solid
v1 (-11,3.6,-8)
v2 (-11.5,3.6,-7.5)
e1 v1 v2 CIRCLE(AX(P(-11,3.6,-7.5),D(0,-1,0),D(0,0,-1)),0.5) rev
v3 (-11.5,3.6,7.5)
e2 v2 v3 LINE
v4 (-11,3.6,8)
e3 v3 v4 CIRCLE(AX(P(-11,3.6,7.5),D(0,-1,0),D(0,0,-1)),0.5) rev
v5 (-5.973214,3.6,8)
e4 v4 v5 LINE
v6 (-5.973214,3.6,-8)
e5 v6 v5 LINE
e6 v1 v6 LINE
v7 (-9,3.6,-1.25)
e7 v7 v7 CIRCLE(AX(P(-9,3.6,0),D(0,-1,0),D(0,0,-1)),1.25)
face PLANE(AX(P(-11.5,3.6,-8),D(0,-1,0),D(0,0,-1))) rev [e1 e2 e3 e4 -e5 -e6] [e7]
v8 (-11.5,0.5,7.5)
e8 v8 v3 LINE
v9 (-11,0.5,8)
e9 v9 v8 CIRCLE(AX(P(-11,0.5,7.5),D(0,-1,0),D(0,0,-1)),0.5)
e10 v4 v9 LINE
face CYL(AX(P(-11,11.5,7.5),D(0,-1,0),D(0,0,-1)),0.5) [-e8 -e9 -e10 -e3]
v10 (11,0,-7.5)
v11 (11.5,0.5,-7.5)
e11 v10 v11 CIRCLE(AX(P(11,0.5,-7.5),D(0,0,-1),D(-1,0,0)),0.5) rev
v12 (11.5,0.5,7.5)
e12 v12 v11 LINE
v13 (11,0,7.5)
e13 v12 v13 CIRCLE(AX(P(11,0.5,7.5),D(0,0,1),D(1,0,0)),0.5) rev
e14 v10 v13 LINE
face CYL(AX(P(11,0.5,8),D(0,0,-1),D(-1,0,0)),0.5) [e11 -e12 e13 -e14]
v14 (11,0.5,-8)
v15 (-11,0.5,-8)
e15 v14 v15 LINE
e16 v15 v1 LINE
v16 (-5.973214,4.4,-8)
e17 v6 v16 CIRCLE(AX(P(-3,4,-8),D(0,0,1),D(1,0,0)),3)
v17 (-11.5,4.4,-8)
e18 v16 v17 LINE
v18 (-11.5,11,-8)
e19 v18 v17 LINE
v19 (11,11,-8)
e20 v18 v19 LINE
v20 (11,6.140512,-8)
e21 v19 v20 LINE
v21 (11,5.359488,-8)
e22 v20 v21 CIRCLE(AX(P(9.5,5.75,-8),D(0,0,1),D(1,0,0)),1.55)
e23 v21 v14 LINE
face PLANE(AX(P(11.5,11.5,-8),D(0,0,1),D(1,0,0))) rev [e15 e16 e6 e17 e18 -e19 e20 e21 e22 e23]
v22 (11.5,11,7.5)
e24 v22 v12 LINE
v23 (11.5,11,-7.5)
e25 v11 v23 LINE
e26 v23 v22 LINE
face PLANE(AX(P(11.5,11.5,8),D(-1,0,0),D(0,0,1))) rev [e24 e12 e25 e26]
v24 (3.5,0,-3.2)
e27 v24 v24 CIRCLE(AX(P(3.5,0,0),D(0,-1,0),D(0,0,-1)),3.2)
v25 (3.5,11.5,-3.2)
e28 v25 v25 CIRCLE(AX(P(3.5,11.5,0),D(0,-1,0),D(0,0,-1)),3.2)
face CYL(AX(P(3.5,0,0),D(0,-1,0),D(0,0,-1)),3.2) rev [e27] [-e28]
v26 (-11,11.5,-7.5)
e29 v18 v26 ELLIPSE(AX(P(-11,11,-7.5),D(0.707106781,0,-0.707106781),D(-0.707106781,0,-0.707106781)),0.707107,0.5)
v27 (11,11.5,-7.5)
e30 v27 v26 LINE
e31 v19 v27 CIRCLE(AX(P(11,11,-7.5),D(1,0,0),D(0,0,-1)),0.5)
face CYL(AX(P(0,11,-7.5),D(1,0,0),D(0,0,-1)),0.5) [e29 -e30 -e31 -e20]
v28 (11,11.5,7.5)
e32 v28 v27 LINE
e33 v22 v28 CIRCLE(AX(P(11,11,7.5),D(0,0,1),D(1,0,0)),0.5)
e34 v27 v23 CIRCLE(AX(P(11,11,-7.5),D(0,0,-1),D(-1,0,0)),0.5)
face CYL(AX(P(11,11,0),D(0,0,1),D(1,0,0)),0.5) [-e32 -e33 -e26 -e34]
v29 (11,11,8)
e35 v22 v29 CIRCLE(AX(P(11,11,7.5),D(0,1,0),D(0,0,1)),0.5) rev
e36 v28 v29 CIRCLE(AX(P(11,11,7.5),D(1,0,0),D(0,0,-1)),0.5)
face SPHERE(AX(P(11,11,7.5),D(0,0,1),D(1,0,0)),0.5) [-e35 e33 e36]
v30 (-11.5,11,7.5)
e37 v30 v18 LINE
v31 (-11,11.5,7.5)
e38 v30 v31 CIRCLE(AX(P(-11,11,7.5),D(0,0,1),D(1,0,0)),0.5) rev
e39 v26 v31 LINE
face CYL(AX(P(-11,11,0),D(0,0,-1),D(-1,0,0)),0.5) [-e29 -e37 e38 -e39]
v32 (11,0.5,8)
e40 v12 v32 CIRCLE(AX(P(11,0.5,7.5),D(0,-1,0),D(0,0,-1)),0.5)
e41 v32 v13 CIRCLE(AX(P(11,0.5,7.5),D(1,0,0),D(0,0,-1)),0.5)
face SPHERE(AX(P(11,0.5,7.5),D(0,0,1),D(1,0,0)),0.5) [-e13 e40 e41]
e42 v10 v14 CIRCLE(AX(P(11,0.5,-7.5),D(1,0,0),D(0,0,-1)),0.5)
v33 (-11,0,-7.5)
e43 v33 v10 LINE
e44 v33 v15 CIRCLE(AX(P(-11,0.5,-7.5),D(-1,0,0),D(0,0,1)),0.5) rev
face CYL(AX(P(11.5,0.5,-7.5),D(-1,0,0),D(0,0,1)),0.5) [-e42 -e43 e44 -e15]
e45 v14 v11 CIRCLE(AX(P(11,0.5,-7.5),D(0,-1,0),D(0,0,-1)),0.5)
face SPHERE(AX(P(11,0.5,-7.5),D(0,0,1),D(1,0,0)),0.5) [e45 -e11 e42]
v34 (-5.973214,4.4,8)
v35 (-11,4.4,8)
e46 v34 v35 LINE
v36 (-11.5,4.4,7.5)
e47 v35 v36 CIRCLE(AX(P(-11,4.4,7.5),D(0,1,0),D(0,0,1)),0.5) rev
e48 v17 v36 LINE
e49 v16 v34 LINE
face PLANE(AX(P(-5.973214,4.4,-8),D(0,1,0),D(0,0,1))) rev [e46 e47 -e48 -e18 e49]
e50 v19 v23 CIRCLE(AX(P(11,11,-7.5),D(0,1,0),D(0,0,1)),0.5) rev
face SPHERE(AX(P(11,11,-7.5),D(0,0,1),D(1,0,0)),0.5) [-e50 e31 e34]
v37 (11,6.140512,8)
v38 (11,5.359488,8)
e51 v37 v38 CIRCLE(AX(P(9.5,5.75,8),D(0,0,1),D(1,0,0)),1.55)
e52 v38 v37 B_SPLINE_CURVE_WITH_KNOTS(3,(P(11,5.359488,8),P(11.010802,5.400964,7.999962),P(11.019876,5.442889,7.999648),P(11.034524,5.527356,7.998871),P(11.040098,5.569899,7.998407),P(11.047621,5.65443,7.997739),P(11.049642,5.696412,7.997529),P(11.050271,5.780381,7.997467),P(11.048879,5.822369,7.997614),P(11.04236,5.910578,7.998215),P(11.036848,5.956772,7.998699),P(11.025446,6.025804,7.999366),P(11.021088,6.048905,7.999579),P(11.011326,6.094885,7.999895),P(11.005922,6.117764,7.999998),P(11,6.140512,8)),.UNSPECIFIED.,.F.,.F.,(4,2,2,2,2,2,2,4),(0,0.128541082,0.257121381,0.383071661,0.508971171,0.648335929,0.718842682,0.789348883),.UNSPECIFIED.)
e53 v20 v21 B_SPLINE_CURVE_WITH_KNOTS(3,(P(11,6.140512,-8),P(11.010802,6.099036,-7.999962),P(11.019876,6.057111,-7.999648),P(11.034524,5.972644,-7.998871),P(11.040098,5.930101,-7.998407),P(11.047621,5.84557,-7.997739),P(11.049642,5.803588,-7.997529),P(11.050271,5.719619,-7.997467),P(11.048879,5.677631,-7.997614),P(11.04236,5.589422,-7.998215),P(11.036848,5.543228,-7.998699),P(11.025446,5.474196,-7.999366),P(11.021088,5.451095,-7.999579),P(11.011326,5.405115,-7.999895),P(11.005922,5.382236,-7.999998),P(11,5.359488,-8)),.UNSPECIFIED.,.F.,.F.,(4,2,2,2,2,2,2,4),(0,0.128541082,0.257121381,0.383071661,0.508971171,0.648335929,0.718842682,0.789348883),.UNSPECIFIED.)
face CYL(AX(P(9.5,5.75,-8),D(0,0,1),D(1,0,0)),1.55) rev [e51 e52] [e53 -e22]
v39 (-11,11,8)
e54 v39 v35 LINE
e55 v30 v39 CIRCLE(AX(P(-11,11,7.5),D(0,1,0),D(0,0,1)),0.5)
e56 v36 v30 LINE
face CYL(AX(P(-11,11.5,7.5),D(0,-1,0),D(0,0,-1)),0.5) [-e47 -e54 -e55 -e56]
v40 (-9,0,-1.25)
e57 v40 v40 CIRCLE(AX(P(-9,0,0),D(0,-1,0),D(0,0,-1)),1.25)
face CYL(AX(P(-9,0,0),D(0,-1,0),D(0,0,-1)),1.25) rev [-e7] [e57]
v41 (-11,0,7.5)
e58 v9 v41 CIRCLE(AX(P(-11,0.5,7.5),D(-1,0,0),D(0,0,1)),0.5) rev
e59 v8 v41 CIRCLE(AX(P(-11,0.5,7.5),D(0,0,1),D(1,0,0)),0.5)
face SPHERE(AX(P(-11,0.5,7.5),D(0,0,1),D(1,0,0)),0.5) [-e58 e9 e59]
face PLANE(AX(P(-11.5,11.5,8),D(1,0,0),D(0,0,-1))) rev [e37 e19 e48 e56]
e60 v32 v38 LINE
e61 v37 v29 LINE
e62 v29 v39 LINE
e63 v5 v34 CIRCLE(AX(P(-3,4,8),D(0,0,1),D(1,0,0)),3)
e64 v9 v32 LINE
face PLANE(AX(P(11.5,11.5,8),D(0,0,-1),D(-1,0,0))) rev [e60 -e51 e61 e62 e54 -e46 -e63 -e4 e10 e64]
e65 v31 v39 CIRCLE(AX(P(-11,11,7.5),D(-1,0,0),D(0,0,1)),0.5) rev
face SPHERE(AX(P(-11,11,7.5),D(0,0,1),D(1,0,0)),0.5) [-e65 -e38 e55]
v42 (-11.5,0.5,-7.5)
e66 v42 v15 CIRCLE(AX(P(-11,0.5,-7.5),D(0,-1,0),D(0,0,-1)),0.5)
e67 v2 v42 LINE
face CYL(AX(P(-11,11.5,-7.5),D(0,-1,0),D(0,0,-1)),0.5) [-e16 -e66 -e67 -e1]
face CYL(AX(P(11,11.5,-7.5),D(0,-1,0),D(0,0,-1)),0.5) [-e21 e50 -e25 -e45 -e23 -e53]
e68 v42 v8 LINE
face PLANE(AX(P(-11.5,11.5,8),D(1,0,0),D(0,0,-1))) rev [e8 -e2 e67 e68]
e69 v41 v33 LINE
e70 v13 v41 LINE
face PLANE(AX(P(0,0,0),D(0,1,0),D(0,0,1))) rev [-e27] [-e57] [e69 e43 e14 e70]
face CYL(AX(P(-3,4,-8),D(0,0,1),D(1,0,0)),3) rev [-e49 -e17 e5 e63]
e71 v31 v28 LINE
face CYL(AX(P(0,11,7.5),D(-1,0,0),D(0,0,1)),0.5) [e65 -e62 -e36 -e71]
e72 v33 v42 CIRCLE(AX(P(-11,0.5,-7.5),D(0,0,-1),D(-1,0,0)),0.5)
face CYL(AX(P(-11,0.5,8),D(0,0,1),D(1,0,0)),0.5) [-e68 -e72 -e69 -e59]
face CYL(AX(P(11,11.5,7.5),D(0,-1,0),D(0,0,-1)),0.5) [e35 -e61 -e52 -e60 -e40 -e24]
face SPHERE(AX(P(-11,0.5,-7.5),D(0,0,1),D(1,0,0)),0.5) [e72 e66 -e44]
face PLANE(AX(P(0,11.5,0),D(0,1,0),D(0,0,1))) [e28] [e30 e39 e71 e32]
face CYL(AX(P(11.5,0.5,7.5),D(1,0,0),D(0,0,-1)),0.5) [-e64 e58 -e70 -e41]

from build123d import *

# Parameters (mm, degrees)
SKETCH1_W                       = 23
SKETCH1_H                       = 16
BOSS_EXTRUDE1_DEPTH             = 11.5
SKETCH2_R                       = 1.55
CUT_EXTRUDE1_DEPTH              = 23.814469093
FILLET1_R                       = 0.5
M6_CLEARANCE_HOLE1_D            = 6.4
TAP_DRILL_FOR_M3X0_5_TAP1_D     = 2.5
TAP_DRILL_FOR_M3X0_5_TAP1_DEPTH = 4.399


with BuildPart() as part:
    # Sketch1 → Boss-Extrude1 (new body)
    with BuildSketch(Plane(origin=(0, 0, 0), x_dir=(1, 0, 0), z_dir=(0, 1, 0))):
        Rectangle(SKETCH1_W, SKETCH1_H)
    extrude(amount=BOSS_EXTRUDE1_DEPTH)

    # Sketch2 → Cut-Extrude1 (cut, through all)
    with BuildSketch(Plane.XY.offset(8)):
        with Locations((9.5, 5.75)):
            Circle(SKETCH2_R)
        with BuildLine():
            Line((-5.973213749, 4.4), (-11.5, 4.4))
            Line((-11.5, 4.4), (-11.5, 3.6))
            Line((-11.5, 3.6), (-5.973213749, 3.6))
            ThreePointArc((-5.973213749, 3.6), (0, 4), (-5.973213749, 4.4))
        make_face()
    extrude(amount=-CUT_EXTRUDE1_DEPTH, mode=Mode.SUBTRACT)

    # Fillet1
    # the kernel refuses this fillet: 0.5 mm, written as the material it takes off along each edge
    with BuildSketch(Plane(origin=(-11, 0.5, 7.5), x_dir=(0, -1, 0), z_dir=(0, 0, 1))) as fillet1_piece_1_section:
        Polygon((0, 0), (FILLET1_R * 1.02, 0), (FILLET1_R * 1.02, -FILLET1_R * 1.02), (0, -FILLET1_R * 1.02), align=None)
    fillet1_piece_1 = extrude(amount=FILLET1_R * 1.02, mode=Mode.PRIVATE)
    fillet1_piece_1 = fillet1_piece_1 - Plane(origin=(-11, 0.5, 7.5), x_dir=(0.7071067811865475, 0.7071067811865475, 0), z_dir=(0, 0, 1)) * Sphere(FILLET1_R, mode=Mode.PRIVATE)
    add(fillet1_piece_1, mode=Mode.SUBTRACT)
    with BuildSketch(Plane(origin=(-11, 11, 7.5), x_dir=(-1, 0, 0), z_dir=(0, 0, 1))) as fillet1_piece_2_section:
        Polygon((0, 0), (FILLET1_R * 1.02, 0), (FILLET1_R * 1.02, -FILLET1_R * 1.02), (0, -FILLET1_R * 1.02), align=None)
    fillet1_piece_2 = extrude(amount=FILLET1_R * 1.02, mode=Mode.PRIVATE)
    fillet1_piece_2 = fillet1_piece_2 - Plane(origin=(-11, 11, 7.5), x_dir=(0.7071067811865475, -0.7071067811865475, 0), z_dir=(0, 0, 1)) * Sphere(FILLET1_R, mode=Mode.PRIVATE)
    add(fillet1_piece_2, mode=Mode.SUBTRACT)
    with BuildSketch(Plane(origin=(11, 0.5, -7.5), x_dir=(0, -1, 0), z_dir=(1, 0, 0))) as fillet1_piece_3_section:
        Polygon((0, 0), (FILLET1_R * 1.02, 0), (FILLET1_R * 1.02, FILLET1_R * 1.02), (0, FILLET1_R * 1.02), align=None)
    fillet1_piece_3 = extrude(amount=FILLET1_R * 1.02, mode=Mode.PRIVATE)
    fillet1_piece_3 = fillet1_piece_3 - Plane(origin=(11, 0.5, -7.5), x_dir=(0, 0.7071067811865475, 0.7071067811865475), z_dir=(1, 0, 0)) * Sphere(FILLET1_R, mode=Mode.PRIVATE)
    add(fillet1_piece_3, mode=Mode.SUBTRACT)
    with BuildSketch(Plane(origin=(11, 11, -7.5), x_dir=(0, 0, -1), z_dir=(1, 0, 0))) as fillet1_piece_4_section:
        Polygon((0, 0), (FILLET1_R * 1.02, 0), (FILLET1_R * 1.02, FILLET1_R * 1.02), (0, FILLET1_R * 1.02), align=None)
    fillet1_piece_4 = extrude(amount=FILLET1_R * 1.02, mode=Mode.PRIVATE)
    fillet1_piece_4 = fillet1_piece_4 - Plane(origin=(11, 11, -7.5), x_dir=(0, -0.7071067811865475, 0.7071067811865475), z_dir=(1, 0, 0)) * Sphere(FILLET1_R, mode=Mode.PRIVATE)
    add(fillet1_piece_4, mode=Mode.SUBTRACT)
    with BuildSketch(Plane(origin=(-11, 0.5, -7.5), x_dir=(-1, 0, 0), z_dir=(0, -1, 0))) as fillet1_piece_5_section:
        Polygon((0, 0), (FILLET1_R * 1.02, 0), (FILLET1_R * 1.02, FILLET1_R * 1.02), (0, FILLET1_R * 1.02), align=None)
    fillet1_piece_5 = extrude(amount=FILLET1_R * 1.02, mode=Mode.PRIVATE)
    fillet1_piece_5 = fillet1_piece_5 - Plane(origin=(-11, 0.5, -7.5), x_dir=(0.7071067811865477, 0, 0.7071067811865474), z_dir=(0, -1, 0)) * Sphere(FILLET1_R, mode=Mode.PRIVATE)
    add(fillet1_piece_5, mode=Mode.SUBTRACT)
    with BuildSketch(Plane(origin=(11, 0.5, 7.5), x_dir=(1, 0, 0), z_dir=(0, 0, 1))) as fillet1_piece_6_section:
        Polygon((0, 0), (FILLET1_R * 1.02, 0), (FILLET1_R * 1.02, -FILLET1_R * 1.02), (0, -FILLET1_R * 1.02), align=None)
    fillet1_piece_6 = extrude(amount=FILLET1_R * 1.02, mode=Mode.PRIVATE)
    fillet1_piece_6 = fillet1_piece_6 - Plane(origin=(11, 0.5, 7.5), x_dir=(-0.7071067811865475, 0.7071067811865475, 1.4130832128153965e-15), z_dir=(0, 0, 1)) * Sphere(FILLET1_R, mode=Mode.PRIVATE)
    add(fillet1_piece_6, mode=Mode.SUBTRACT)
    with BuildSketch(Plane(origin=(11, 11, 7.5), x_dir=(1, 0, 0), z_dir=(0, 0, 1))) as fillet1_piece_7_section:
        Polygon((0, 0), (FILLET1_R * 1.02, 0), (FILLET1_R * 1.02, FILLET1_R * 1.02), (0, FILLET1_R * 1.02), align=None)
    fillet1_piece_7 = extrude(amount=FILLET1_R * 1.02, mode=Mode.PRIVATE)
    fillet1_piece_7 = fillet1_piece_7 - Plane(origin=(11, 11, 7.5), x_dir=(-0.7071067811865475, -0.7071067811865475, 1.4130832128153965e-15), z_dir=(0, 0, 1)) * Sphere(FILLET1_R, mode=Mode.PRIVATE)
    add(fillet1_piece_7, mode=Mode.SUBTRACT)
    with BuildSketch(Plane(origin=(-11.5, 0.5, 8), x_dir=(1, 0, 0), z_dir=(0, 1, 0))) as fillet1_piece_8:
        with BuildLine():
            CenterArc((FILLET1_R, FILLET1_R), FILLET1_R, 180, 90)
            Line((0, FILLET1_R), (0, 0))
            Line((0, 0), (FILLET1_R, 0))
        make_face()
    extrude(amount=4.35, mode=Mode.SUBTRACT)
    with BuildSketch(Plane(origin=(-11.5, 3.15, 8), x_dir=(1, 0, 0), z_dir=(0, 1, 0))) as fillet1_piece_9:
        with BuildLine():
            CenterArc((FILLET1_R, FILLET1_R), FILLET1_R, 180, 90)
            Line((0, FILLET1_R), (0, 0))
            Line((0, 0), (FILLET1_R, 0))
        make_face()
    extrude(amount=7.85, mode=Mode.SUBTRACT)
    with BuildSketch(Plane(origin=(11.5, 0.5, -8), x_dir=(0, 0, 1), z_dir=(0, 1, 0)), Plane(origin=(11.5, 0.5, 8), x_dir=(-1, 0, 0), z_dir=(0, 1, 0))) as fillet1_piece_10:
        with BuildLine():
            CenterArc((FILLET1_R, -FILLET1_R), FILLET1_R, 90, 90)
            Line((0, -FILLET1_R), (0, 0))
            Line((0, 0), (FILLET1_R, 0))
        make_face()
    extrude(amount=10.5, mode=Mode.SUBTRACT)
    with BuildSketch(Plane(origin=(-11.5, 0.5, -8), x_dir=(0, 0, 1), z_dir=(0, 1, 0))) as fillet1_piece_11_section:
        with BuildLine():
            CenterArc((FILLET1_R, FILLET1_R), FILLET1_R, 180, 90)
            Line((0, FILLET1_R), (0, 0))
            Line((0, 0), (FILLET1_R, 0))
        make_face()
    fillet1_piece_11 = extrude(amount=4.35, mode=Mode.PRIVATE)
    fillet1_piece_11 = split(fillet1_piece_11, bisect_by=Plane(origin=(-11.388316031, 4.4, -7.888316031), z_dir=(0, -1, 0)), keep=Keep.TOP, mode=Mode.PRIVATE)
    add(fillet1_piece_11, mode=Mode.SUBTRACT)
    with BuildSketch(Plane(origin=(11.5, 0, -7.5), x_dir=(-1, 0, 0), z_dir=(0, 0, 1)), Plane(origin=(-11.5, 0, 7.5), x_dir=(1, 0, 0), z_dir=(0, 0, -1))) as fillet1_piece_12:
        with BuildLine():
            CenterArc((FILLET1_R, -FILLET1_R), FILLET1_R, 90, 90)
            Line((0, -FILLET1_R), (0, 0))
            Line((0, 0), (FILLET1_R, 0))
        make_face()
    extrude(amount=15, mode=Mode.SUBTRACT)
    with BuildSketch(Plane(origin=(-11, 0, -8), x_dir=(0, 0, 1), z_dir=(1, 0, 0)), Plane(origin=(11, 11.5, 8), x_dir=(0, -1, 0), z_dir=(-1, 0, 0))) as fillet1_piece_13:
        with BuildLine():
            CenterArc((FILLET1_R, -FILLET1_R), FILLET1_R, 90, 90)
            Line((0, -FILLET1_R), (0, 0))
            Line((0, 0), (FILLET1_R, 0))
        make_face()
    extrude(amount=22, mode=Mode.SUBTRACT)
    with BuildSketch(Plane(origin=(11, 0, 8), x_dir=(0, 1, 0), z_dir=(-1, 0, 0))) as fillet1_piece_14:
        with BuildLine():
            CenterArc((FILLET1_R, FILLET1_R), FILLET1_R, 180, 90)
            Line((0, FILLET1_R), (0, 0))
            Line((0, 0), (FILLET1_R, 0))
        make_face()
    extrude(amount=22, mode=Mode.SUBTRACT)
    with BuildSketch(Plane(origin=(-12.75, 11.5, -8), x_dir=(0, 0, 1), z_dir=(1, 0, 0))) as fillet1_piece_15:
        with BuildLine():
            CenterArc((FILLET1_R, FILLET1_R), FILLET1_R, 180, 90)
            Line((0, FILLET1_R), (0, 0))
            Line((0, 0), (FILLET1_R, 0))
        make_face()
    extrude(amount=23.75, mode=Mode.SUBTRACT)
    with BuildSketch(Plane(origin=(11.5, 11.5, -7.5), x_dir=(-1, 0, 0), z_dir=(0, 0, 1))) as fillet1_piece_16:
        with BuildLine():
            CenterArc((FILLET1_R, FILLET1_R), FILLET1_R, 180, 90)
            Line((0, FILLET1_R), (0, 0))
            Line((0, 0), (FILLET1_R, 0))
        make_face()
    extrude(amount=15, mode=Mode.SUBTRACT)
    with BuildSketch(Plane(origin=(-11.5, 11.5, 7.5), x_dir=(0, -1, 0), z_dir=(0, 0, -1))) as fillet1_piece_17:
        with BuildLine():
            CenterArc((FILLET1_R, -FILLET1_R), FILLET1_R, 90, 90)
            Line((0, -FILLET1_R), (0, 0))
            Line((0, 0), (FILLET1_R, 0))
        make_face()
    extrude(amount=16.75, mode=Mode.SUBTRACT)

    # M6 Clearance Hole1 (through all)
    with Locations(Plane(origin=(0, 0, 0), x_dir=(-1, 0, 0), z_dir=(0, -1, 0))):
        with Locations((-3.5, 0)):
            Hole(M6_CLEARANCE_HOLE1_D / 2)

    # Tap Drill for M3x0.5 Tap1
    with Locations(Plane(origin=(0, 0, 0), x_dir=(-1, 0, 0), z_dir=(0, -1, 0))):
        with Locations((9, 0)):
            Hole(TAP_DRILL_FOR_M3X0_5_TAP1_D / 2, depth=TAP_DRILL_FOR_M3X0_5_TAP1_DEPTH)


solid = part.part
